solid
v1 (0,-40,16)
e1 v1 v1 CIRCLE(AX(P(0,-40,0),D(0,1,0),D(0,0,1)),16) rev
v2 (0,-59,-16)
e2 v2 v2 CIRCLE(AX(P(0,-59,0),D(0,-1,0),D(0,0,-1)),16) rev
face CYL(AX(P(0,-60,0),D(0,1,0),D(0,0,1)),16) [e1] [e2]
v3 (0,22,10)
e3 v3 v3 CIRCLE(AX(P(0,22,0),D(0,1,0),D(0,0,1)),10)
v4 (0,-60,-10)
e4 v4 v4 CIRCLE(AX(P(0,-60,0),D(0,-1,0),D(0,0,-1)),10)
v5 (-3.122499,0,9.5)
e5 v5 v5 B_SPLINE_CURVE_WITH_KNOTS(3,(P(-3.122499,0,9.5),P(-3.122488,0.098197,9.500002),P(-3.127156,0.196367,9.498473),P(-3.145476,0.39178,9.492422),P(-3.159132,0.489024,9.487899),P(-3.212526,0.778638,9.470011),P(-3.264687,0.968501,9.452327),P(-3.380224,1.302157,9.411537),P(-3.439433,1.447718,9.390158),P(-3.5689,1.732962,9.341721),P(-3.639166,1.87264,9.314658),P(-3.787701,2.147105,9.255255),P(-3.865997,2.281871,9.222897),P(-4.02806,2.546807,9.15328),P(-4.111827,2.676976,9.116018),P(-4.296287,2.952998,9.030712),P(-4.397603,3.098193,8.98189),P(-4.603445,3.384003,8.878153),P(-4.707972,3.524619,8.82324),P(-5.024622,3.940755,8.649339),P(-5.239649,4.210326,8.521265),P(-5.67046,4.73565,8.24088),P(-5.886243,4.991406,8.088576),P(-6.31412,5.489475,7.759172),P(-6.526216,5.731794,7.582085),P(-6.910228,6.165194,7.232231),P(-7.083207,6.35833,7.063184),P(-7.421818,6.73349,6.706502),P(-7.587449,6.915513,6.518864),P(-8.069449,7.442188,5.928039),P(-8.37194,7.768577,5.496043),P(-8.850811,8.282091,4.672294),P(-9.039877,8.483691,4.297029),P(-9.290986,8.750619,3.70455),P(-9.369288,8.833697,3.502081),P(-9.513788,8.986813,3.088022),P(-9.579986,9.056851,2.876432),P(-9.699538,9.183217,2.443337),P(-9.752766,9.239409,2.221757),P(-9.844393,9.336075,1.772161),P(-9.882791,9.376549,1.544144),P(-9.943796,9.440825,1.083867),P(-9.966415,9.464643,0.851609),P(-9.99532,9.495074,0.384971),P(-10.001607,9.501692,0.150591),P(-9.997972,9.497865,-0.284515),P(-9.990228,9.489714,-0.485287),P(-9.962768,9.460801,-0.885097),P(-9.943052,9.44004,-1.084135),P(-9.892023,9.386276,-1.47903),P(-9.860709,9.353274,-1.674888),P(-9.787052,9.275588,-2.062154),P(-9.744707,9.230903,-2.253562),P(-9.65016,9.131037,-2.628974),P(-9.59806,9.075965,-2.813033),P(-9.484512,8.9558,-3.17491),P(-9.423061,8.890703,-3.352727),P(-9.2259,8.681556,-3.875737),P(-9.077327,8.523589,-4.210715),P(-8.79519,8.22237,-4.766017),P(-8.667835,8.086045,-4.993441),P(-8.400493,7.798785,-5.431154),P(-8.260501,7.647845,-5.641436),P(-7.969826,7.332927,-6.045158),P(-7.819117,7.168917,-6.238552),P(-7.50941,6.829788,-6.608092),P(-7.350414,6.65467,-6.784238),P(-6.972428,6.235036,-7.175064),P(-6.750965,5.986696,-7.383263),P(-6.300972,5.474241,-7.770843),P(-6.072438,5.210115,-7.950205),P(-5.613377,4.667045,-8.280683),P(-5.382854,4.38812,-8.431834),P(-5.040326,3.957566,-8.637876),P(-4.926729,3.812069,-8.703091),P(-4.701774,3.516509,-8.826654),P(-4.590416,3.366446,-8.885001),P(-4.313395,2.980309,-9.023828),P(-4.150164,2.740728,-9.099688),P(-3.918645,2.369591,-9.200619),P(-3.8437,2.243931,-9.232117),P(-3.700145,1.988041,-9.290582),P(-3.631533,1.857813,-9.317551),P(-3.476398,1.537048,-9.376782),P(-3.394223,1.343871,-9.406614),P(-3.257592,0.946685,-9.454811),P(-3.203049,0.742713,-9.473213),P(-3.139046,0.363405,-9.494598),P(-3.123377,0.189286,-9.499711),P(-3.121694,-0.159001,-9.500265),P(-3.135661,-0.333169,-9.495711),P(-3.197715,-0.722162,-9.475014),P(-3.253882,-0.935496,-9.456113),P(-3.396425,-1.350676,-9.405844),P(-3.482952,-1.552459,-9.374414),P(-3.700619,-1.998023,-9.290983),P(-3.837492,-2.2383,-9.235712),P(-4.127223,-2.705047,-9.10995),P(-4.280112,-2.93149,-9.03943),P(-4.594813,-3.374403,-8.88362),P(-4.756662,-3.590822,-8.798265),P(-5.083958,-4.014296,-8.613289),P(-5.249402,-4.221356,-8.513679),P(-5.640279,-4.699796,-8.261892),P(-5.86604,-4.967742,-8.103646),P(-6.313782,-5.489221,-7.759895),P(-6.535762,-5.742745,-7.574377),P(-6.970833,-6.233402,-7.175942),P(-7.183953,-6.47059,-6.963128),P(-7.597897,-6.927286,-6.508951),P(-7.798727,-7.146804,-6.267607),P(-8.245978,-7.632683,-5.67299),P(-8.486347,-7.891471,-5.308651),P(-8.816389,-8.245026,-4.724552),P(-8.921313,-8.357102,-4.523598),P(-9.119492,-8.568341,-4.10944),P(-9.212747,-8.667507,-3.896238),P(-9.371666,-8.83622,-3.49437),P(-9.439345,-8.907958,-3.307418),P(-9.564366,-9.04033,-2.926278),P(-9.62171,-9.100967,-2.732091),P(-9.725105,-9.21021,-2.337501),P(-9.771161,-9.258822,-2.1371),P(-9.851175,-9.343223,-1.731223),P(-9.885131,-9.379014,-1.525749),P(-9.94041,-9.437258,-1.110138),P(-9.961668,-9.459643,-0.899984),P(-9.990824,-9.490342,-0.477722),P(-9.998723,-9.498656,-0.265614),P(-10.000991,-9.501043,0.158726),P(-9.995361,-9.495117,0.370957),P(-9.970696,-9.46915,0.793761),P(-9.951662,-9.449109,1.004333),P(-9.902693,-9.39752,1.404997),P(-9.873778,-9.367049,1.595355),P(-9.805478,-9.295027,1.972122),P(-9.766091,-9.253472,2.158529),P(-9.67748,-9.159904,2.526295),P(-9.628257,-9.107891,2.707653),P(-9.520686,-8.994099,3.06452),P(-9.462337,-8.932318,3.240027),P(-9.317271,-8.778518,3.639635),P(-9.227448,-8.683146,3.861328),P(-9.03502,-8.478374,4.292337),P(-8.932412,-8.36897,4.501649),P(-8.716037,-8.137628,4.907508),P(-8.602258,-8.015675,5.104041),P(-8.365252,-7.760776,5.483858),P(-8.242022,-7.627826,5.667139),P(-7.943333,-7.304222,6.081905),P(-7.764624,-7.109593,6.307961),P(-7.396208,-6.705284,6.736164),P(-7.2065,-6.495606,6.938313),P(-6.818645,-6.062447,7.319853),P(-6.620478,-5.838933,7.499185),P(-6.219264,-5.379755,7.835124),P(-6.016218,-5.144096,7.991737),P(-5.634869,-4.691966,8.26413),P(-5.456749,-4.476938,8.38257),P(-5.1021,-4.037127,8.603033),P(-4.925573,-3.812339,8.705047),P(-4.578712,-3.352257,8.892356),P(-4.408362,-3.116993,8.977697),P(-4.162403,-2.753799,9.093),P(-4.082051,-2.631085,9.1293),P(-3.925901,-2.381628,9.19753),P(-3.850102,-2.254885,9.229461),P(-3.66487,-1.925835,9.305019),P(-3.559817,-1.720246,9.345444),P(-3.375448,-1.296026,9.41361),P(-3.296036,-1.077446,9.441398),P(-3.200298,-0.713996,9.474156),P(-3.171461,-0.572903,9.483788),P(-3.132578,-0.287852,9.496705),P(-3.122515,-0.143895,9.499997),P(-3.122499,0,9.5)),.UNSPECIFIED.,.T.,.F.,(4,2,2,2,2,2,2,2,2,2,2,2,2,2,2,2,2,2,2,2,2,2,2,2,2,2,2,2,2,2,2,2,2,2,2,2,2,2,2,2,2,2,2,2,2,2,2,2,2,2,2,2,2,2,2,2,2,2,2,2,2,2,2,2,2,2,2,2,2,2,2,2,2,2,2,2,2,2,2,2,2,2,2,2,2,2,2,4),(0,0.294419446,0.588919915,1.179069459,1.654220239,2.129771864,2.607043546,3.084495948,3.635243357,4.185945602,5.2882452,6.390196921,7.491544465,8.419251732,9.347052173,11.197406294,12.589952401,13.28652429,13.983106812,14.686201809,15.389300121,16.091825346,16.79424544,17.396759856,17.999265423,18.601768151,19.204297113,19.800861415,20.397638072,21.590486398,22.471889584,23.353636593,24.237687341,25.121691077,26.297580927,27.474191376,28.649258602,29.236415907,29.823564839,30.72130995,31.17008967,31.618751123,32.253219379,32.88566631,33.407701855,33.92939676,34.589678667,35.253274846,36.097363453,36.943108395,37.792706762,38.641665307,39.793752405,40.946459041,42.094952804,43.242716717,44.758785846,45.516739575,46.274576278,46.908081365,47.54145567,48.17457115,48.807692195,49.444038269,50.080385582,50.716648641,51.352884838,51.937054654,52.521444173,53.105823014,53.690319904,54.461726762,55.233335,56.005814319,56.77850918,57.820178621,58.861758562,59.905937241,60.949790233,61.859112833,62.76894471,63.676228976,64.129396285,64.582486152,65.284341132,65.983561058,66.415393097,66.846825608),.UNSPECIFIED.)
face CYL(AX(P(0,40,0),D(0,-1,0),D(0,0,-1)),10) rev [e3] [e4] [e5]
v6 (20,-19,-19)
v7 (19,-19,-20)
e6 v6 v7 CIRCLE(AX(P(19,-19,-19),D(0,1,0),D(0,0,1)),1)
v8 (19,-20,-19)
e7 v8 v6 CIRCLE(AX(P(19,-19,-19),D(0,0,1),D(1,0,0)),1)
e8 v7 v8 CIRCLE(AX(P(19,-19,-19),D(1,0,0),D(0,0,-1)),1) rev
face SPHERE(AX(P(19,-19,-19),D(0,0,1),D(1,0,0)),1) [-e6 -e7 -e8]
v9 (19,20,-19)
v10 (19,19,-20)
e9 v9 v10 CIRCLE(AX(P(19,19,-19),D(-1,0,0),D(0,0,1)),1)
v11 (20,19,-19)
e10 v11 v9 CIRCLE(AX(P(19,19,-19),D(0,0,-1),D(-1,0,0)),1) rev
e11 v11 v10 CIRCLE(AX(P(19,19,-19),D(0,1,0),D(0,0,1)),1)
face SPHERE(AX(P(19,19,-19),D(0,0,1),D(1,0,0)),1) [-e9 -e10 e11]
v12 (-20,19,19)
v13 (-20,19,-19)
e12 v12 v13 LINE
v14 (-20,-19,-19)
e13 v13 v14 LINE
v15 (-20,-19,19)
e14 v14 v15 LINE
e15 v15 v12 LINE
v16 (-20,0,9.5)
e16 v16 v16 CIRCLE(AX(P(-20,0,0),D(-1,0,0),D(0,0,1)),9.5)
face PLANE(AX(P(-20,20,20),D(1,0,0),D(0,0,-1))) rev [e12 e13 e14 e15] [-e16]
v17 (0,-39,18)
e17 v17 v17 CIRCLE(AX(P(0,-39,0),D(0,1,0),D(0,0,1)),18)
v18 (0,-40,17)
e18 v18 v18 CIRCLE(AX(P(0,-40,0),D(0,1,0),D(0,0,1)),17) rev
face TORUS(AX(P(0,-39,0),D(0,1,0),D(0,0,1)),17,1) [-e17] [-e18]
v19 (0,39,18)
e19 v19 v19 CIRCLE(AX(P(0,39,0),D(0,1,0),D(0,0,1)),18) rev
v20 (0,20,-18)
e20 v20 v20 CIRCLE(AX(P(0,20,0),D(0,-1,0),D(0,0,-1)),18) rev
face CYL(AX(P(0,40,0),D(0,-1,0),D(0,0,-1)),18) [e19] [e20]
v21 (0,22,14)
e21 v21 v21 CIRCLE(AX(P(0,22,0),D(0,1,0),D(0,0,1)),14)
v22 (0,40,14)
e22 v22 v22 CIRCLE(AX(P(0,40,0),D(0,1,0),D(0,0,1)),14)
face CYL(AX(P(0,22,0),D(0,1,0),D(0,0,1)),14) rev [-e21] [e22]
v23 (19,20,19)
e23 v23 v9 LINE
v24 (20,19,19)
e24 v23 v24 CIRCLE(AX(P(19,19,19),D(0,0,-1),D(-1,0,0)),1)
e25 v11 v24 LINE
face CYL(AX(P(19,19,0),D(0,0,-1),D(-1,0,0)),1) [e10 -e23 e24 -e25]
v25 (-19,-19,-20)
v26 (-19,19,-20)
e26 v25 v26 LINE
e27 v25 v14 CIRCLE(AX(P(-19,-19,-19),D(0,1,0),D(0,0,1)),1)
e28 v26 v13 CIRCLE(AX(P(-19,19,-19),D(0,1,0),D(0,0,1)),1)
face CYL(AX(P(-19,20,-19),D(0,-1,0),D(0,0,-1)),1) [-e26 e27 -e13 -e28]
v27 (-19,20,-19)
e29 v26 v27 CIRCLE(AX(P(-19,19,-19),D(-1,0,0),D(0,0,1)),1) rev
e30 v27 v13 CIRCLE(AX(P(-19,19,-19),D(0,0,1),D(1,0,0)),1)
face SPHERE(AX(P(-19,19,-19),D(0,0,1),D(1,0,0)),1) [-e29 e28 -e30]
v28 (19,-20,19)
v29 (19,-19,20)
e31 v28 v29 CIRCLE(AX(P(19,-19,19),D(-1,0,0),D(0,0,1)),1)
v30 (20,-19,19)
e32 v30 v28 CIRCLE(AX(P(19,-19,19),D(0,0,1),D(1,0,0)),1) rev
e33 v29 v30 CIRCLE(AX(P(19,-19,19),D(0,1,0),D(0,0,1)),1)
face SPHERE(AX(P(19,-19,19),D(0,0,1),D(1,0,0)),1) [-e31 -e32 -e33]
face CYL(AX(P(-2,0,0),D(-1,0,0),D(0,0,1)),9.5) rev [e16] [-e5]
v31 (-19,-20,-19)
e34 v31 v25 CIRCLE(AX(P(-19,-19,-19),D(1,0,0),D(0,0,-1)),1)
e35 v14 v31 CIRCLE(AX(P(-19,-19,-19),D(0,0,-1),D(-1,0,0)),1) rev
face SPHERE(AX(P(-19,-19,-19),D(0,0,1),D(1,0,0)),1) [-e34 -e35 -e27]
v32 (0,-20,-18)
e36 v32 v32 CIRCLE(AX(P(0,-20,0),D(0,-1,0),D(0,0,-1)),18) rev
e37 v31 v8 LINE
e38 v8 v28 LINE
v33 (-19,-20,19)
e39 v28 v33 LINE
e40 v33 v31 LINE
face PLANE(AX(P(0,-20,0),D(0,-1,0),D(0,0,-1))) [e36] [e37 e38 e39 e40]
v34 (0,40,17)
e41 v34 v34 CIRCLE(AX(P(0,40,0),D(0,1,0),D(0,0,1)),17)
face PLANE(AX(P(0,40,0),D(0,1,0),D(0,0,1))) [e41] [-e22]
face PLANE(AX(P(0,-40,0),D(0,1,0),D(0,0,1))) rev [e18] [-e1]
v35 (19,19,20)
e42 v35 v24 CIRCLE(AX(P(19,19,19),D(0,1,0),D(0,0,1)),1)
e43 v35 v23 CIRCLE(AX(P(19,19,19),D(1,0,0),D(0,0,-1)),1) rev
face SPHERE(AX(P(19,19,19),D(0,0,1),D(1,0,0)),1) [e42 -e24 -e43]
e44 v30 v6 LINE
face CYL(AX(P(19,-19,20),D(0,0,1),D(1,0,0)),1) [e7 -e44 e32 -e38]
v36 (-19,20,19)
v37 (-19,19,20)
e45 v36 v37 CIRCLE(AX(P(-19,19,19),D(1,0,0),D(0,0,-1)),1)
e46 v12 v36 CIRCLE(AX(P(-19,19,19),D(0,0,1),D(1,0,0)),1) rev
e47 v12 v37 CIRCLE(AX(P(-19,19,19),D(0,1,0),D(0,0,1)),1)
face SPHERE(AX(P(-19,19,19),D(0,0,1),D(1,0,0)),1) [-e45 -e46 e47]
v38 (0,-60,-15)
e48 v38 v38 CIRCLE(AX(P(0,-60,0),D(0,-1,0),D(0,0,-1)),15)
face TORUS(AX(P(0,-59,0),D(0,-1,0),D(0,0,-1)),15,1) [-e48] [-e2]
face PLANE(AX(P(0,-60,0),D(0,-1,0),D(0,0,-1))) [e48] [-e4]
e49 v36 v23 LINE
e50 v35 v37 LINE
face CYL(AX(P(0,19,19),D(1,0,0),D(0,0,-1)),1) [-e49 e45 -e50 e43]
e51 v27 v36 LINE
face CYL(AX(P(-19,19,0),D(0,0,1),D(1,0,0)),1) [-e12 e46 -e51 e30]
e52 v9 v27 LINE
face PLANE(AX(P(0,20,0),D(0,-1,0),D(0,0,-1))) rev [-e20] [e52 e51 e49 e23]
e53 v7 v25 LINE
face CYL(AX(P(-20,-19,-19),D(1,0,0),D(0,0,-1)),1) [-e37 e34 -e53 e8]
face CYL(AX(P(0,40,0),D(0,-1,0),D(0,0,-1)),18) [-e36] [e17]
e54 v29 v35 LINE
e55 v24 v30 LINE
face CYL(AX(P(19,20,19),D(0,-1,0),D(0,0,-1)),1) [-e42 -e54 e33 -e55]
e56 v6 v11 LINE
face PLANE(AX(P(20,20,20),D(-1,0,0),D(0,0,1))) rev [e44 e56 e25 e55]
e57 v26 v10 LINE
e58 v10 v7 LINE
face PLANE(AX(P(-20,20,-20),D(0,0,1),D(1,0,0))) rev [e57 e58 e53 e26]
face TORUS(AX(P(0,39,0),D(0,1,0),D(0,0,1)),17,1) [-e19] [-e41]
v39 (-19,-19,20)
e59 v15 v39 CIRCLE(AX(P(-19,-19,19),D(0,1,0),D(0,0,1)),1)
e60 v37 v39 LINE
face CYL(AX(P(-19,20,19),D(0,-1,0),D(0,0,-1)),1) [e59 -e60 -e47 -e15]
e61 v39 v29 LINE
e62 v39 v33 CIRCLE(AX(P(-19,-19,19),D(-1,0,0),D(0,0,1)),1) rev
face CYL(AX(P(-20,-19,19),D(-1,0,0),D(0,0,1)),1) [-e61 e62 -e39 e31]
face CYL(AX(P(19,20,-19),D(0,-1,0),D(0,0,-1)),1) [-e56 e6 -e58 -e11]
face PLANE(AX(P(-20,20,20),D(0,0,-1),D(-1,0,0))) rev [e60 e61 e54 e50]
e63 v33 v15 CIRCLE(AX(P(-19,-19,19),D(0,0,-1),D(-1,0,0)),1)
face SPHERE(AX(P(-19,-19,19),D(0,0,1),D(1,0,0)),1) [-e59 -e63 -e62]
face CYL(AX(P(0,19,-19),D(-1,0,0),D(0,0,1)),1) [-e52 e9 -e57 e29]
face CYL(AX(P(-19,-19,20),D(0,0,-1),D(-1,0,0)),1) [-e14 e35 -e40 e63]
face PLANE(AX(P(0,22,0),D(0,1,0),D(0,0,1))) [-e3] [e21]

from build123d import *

# Parameters (mm, degrees)
CROQUIS1_W              = 40
CROQUIS1_H              = 40
SALIENTE_EXTRUIR2_DEPTH = 20
CROQUIS4_R              = 18
SALIENTE_EXTRUIR3_DEPTH = 40
REDONDEO1_R             = 1
CROQUIS5_R              = 16
SALIENTE_EXTRUIR4_DEPTH = 20
REDONDEO2_R             = 1
CROQUIS6_R              = 14
CORTAR_EXTRUIR1_DEPTH   = 18
CROQUIS7_R              = 10
CORTAR_EXTRUIR3_DEPTH   = 104.923048454
CROQUIS8_R              = 9.5
CORTAR_EXTRUIR4_DEPTH   = 18
REDONDEO3_R             = 1


with BuildPart() as part:
    # Croquis1 → Saliente-Extruir2 (new, symmetric)
    with BuildSketch(Plane(origin=(0, 0, 0), x_dir=(1, 0, 0), z_dir=(0, 1, 0))):
        Rectangle(CROQUIS1_W, CROQUIS1_H)
    extrude(amount=SALIENTE_EXTRUIR2_DEPTH, both=True)

    # Croquis4 → Saliente-Extruir3 (add, symmetric)
    with BuildSketch(Plane(origin=(0, 0, 0), x_dir=(1, 0, 0), z_dir=(0, 1, 0))):
        with Locations(Location((0, 0, 0), (0, 0, 90))):
            Circle(CROQUIS4_R)
    extrude(amount=SALIENTE_EXTRUIR3_DEPTH, both=True)

    # Redondeo1
    redondeo1_edges = [part.edges().sort_by_distance(p)[0] for p in [
        (-20, 20, 0),
        (0, 20, 20),
        (0, -40, 18),
        (0, 40, 18),
        (20, 20, 0),
        (0, -20, 20),
        (-20, -20, 0),
        (0, -20, -20),
        (20, -20, 0),
        (0, 20, -20),
    ]]
    fillet(redondeo1_edges, radius=REDONDEO1_R)

    # Croquis5 → Saliente-Extruir4 (add)
    with BuildSketch(Plane.XZ.offset(40)):
        with Locations(Location((0, 0, 0), (0, 0, 90))):
            Circle(CROQUIS5_R)
    extrude(amount=SALIENTE_EXTRUIR4_DEPTH)

    # Redondeo2
    redondeo2_edges = [part.edges().sort_by_distance(p)[0] for p in [
        (0, -60, -16),
    ]]
    fillet(redondeo2_edges, radius=REDONDEO2_R)

    # Croquis6 → Cortar-Extruir1 (cut)
    with BuildSketch(Plane(origin=(0, 40, 0), x_dir=(1, 0, 0), z_dir=(0, 1, 0))):
        with Locations(Location((0, 0, 0), (0, 0, 270))):
            Circle(CROQUIS6_R)
    extrude(amount=-CORTAR_EXTRUIR1_DEPTH, mode=Mode.SUBTRACT)

    # Croquis7 → Cortar-Extruir3 (cut, through all)
    with BuildSketch(Plane.XZ.offset(60)):
        with Locations(Location((0, 0, 0), (0, 0, 270))):
            Circle(CROQUIS7_R)
    extrude(amount=-CORTAR_EXTRUIR3_DEPTH, mode=Mode.SUBTRACT)

    # Croquis8 → Cortar-Extruir4 (cut)
    with BuildSketch(Plane.ZY.offset(20)):
        Circle(CROQUIS8_R)
    extrude(amount=-CORTAR_EXTRUIR4_DEPTH, mode=Mode.SUBTRACT)

    # Redondeo3
    # the kernel refuses this fillet: 1 mm, written as the material it takes off along each edge
    with BuildSketch(Plane(origin=(19, -19, 19), x_dir=(1, 0, 0), z_dir=(0, 0, 1))) as redondeo3_piece_1_section:
        Polygon((0, 0), (REDONDEO3_R, 0), (REDONDEO3_R, -REDONDEO3_R), (0, -REDONDEO3_R), align=None)
    redondeo3_piece_1 = extrude(amount=REDONDEO3_R, mode=Mode.PRIVATE)
    redondeo3_piece_1 = redondeo3_piece_1 - Plane(origin=(19, -19, 19), x_dir=(-0.7071067811865475, 0.7071067811865475, 0), z_dir=(0, 0, 1)) * Sphere(REDONDEO3_R, mode=Mode.PRIVATE)
    add(redondeo3_piece_1, mode=Mode.SUBTRACT)
    with BuildSketch(Plane(origin=(-19, -19, 19), x_dir=(0, 0, 1), z_dir=(-1, 0, 0))) as redondeo3_piece_2_section:
        Polygon((0, 0), (REDONDEO3_R, 0), (REDONDEO3_R, -REDONDEO3_R), (0, -REDONDEO3_R), align=None)
    redondeo3_piece_2 = extrude(amount=REDONDEO3_R, mode=Mode.PRIVATE)
    redondeo3_piece_2 = redondeo3_piece_2 - Plane(origin=(-19, -19, 19), x_dir=(0, 0.7071067811865475, -0.7071067811865475), z_dir=(-1, 0, 0)) * Sphere(REDONDEO3_R, mode=Mode.PRIVATE)
    add(redondeo3_piece_2, mode=Mode.SUBTRACT)
    with BuildSketch(Plane(origin=(19, -19, -19), x_dir=(1, 0, 0), z_dir=(0, 0, -1))) as redondeo3_piece_3_section:
        Polygon((0, 0), (REDONDEO3_R, 0), (REDONDEO3_R, REDONDEO3_R), (0, REDONDEO3_R), align=None)
    redondeo3_piece_3 = extrude(amount=REDONDEO3_R, mode=Mode.PRIVATE)
    redondeo3_piece_3 = redondeo3_piece_3 - Plane(origin=(19, -19, -19), x_dir=(-0.7071067811865475, 0.7071067811865475, 0), z_dir=(0, 0, -1)) * Sphere(REDONDEO3_R, mode=Mode.PRIVATE)
    add(redondeo3_piece_3, mode=Mode.SUBTRACT)
    with BuildSketch(Plane(origin=(-19, -19, -19), x_dir=(0, 0, -1), z_dir=(-1, 0, 0))) as redondeo3_piece_4_section:
        Polygon((0, 0), (REDONDEO3_R, 0), (REDONDEO3_R, REDONDEO3_R), (0, REDONDEO3_R), align=None)
    redondeo3_piece_4 = extrude(amount=REDONDEO3_R, mode=Mode.PRIVATE)
    redondeo3_piece_4 = redondeo3_piece_4 - Plane(origin=(-19, -19, -19), x_dir=(0, 0.7071067811865475, 0.7071067811865475), z_dir=(-1, 0, 0)) * Sphere(REDONDEO3_R, mode=Mode.PRIVATE)
    add(redondeo3_piece_4, mode=Mode.SUBTRACT)
    with BuildSketch(Plane(origin=(19, 19, 19), x_dir=(1, 0, 0), z_dir=(0, 0, 1))) as redondeo3_piece_5_section:
        Polygon((0, 0), (REDONDEO3_R, 0), (REDONDEO3_R, REDONDEO3_R), (0, REDONDEO3_R), align=None)
    redondeo3_piece_5 = extrude(amount=REDONDEO3_R, mode=Mode.PRIVATE)
    redondeo3_piece_5 = redondeo3_piece_5 - Plane(origin=(19, 19, 19), x_dir=(-0.7071067811865475, -0.7071067811865475, 0), z_dir=(0, 0, 1)) * Sphere(REDONDEO3_R, mode=Mode.PRIVATE)
    add(redondeo3_piece_5, mode=Mode.SUBTRACT)
    with BuildSketch(Plane(origin=(-19, 19, 19), x_dir=(0, 0, 1), z_dir=(-1, 0, 0))) as redondeo3_piece_6_section:
        Polygon((0, 0), (REDONDEO3_R, 0), (REDONDEO3_R, REDONDEO3_R), (0, REDONDEO3_R), align=None)
    redondeo3_piece_6 = extrude(amount=REDONDEO3_R, mode=Mode.PRIVATE)
    redondeo3_piece_6 = redondeo3_piece_6 - Plane(origin=(-19, 19, 19), x_dir=(0, -0.7071067811865475, -0.7071067811865475), z_dir=(-1, 0, 0)) * Sphere(REDONDEO3_R, mode=Mode.PRIVATE)
    add(redondeo3_piece_6, mode=Mode.SUBTRACT)
    with BuildSketch(Plane(origin=(19, 19, -19), x_dir=(1, 0, 0), z_dir=(0, 0, -1))) as redondeo3_piece_7_section:
        Polygon((0, 0), (REDONDEO3_R, 0), (REDONDEO3_R, -REDONDEO3_R), (0, -REDONDEO3_R), align=None)
    redondeo3_piece_7 = extrude(amount=REDONDEO3_R, mode=Mode.PRIVATE)
    redondeo3_piece_7 = redondeo3_piece_7 - Plane(origin=(19, 19, -19), x_dir=(-0.7071067811865475, -0.7071067811865475, 0), z_dir=(0, 0, -1)) * Sphere(REDONDEO3_R, mode=Mode.PRIVATE)
    add(redondeo3_piece_7, mode=Mode.SUBTRACT)
    with BuildSketch(Plane(origin=(-19, 19, -19), x_dir=(0, 0, -1), z_dir=(-1, 0, 0))) as redondeo3_piece_8_section:
        Polygon((0, 0), (REDONDEO3_R, 0), (REDONDEO3_R, -REDONDEO3_R), (0, -REDONDEO3_R), align=None)
    redondeo3_piece_8 = extrude(amount=REDONDEO3_R, mode=Mode.PRIVATE)
    redondeo3_piece_8 = redondeo3_piece_8 - Plane(origin=(-19, 19, -19), x_dir=(0, -0.7071067811865475, 0.7071067811865475), z_dir=(-1, 0, 0)) * Sphere(REDONDEO3_R, mode=Mode.PRIVATE)
    add(redondeo3_piece_8, mode=Mode.SUBTRACT)
    with BuildSketch(Plane(origin=(-20, 19, -20), x_dir=(0, 0, 1), z_dir=(0, -1, 0)), Plane(origin=(20, -19, 20), x_dir=(-1, 0, 0), z_dir=(0, 1, 0))) as redondeo3_piece_9:
        with BuildLine():
            CenterArc((REDONDEO3_R, -REDONDEO3_R), REDONDEO3_R, 90, 90)
            Line((0, -REDONDEO3_R), (0, 0))
            Line((0, 0), (REDONDEO3_R, 0))
        make_face()
    extrude(amount=38, mode=Mode.SUBTRACT)
    with BuildSketch(Plane(origin=(20, -19, -20), x_dir=(-1, 0, 0), z_dir=(0, 1, 0)), Plane(origin=(-20, 19, 20), x_dir=(0, 0, -1), z_dir=(0, -1, 0))) as redondeo3_piece_10:
        with BuildLine():
            CenterArc((REDONDEO3_R, REDONDEO3_R), REDONDEO3_R, 180, 90)
            Line((0, REDONDEO3_R), (0, 0))
            Line((0, 0), (REDONDEO3_R, 0))
        make_face()
    extrude(amount=38, mode=Mode.SUBTRACT)


solid = part.part
